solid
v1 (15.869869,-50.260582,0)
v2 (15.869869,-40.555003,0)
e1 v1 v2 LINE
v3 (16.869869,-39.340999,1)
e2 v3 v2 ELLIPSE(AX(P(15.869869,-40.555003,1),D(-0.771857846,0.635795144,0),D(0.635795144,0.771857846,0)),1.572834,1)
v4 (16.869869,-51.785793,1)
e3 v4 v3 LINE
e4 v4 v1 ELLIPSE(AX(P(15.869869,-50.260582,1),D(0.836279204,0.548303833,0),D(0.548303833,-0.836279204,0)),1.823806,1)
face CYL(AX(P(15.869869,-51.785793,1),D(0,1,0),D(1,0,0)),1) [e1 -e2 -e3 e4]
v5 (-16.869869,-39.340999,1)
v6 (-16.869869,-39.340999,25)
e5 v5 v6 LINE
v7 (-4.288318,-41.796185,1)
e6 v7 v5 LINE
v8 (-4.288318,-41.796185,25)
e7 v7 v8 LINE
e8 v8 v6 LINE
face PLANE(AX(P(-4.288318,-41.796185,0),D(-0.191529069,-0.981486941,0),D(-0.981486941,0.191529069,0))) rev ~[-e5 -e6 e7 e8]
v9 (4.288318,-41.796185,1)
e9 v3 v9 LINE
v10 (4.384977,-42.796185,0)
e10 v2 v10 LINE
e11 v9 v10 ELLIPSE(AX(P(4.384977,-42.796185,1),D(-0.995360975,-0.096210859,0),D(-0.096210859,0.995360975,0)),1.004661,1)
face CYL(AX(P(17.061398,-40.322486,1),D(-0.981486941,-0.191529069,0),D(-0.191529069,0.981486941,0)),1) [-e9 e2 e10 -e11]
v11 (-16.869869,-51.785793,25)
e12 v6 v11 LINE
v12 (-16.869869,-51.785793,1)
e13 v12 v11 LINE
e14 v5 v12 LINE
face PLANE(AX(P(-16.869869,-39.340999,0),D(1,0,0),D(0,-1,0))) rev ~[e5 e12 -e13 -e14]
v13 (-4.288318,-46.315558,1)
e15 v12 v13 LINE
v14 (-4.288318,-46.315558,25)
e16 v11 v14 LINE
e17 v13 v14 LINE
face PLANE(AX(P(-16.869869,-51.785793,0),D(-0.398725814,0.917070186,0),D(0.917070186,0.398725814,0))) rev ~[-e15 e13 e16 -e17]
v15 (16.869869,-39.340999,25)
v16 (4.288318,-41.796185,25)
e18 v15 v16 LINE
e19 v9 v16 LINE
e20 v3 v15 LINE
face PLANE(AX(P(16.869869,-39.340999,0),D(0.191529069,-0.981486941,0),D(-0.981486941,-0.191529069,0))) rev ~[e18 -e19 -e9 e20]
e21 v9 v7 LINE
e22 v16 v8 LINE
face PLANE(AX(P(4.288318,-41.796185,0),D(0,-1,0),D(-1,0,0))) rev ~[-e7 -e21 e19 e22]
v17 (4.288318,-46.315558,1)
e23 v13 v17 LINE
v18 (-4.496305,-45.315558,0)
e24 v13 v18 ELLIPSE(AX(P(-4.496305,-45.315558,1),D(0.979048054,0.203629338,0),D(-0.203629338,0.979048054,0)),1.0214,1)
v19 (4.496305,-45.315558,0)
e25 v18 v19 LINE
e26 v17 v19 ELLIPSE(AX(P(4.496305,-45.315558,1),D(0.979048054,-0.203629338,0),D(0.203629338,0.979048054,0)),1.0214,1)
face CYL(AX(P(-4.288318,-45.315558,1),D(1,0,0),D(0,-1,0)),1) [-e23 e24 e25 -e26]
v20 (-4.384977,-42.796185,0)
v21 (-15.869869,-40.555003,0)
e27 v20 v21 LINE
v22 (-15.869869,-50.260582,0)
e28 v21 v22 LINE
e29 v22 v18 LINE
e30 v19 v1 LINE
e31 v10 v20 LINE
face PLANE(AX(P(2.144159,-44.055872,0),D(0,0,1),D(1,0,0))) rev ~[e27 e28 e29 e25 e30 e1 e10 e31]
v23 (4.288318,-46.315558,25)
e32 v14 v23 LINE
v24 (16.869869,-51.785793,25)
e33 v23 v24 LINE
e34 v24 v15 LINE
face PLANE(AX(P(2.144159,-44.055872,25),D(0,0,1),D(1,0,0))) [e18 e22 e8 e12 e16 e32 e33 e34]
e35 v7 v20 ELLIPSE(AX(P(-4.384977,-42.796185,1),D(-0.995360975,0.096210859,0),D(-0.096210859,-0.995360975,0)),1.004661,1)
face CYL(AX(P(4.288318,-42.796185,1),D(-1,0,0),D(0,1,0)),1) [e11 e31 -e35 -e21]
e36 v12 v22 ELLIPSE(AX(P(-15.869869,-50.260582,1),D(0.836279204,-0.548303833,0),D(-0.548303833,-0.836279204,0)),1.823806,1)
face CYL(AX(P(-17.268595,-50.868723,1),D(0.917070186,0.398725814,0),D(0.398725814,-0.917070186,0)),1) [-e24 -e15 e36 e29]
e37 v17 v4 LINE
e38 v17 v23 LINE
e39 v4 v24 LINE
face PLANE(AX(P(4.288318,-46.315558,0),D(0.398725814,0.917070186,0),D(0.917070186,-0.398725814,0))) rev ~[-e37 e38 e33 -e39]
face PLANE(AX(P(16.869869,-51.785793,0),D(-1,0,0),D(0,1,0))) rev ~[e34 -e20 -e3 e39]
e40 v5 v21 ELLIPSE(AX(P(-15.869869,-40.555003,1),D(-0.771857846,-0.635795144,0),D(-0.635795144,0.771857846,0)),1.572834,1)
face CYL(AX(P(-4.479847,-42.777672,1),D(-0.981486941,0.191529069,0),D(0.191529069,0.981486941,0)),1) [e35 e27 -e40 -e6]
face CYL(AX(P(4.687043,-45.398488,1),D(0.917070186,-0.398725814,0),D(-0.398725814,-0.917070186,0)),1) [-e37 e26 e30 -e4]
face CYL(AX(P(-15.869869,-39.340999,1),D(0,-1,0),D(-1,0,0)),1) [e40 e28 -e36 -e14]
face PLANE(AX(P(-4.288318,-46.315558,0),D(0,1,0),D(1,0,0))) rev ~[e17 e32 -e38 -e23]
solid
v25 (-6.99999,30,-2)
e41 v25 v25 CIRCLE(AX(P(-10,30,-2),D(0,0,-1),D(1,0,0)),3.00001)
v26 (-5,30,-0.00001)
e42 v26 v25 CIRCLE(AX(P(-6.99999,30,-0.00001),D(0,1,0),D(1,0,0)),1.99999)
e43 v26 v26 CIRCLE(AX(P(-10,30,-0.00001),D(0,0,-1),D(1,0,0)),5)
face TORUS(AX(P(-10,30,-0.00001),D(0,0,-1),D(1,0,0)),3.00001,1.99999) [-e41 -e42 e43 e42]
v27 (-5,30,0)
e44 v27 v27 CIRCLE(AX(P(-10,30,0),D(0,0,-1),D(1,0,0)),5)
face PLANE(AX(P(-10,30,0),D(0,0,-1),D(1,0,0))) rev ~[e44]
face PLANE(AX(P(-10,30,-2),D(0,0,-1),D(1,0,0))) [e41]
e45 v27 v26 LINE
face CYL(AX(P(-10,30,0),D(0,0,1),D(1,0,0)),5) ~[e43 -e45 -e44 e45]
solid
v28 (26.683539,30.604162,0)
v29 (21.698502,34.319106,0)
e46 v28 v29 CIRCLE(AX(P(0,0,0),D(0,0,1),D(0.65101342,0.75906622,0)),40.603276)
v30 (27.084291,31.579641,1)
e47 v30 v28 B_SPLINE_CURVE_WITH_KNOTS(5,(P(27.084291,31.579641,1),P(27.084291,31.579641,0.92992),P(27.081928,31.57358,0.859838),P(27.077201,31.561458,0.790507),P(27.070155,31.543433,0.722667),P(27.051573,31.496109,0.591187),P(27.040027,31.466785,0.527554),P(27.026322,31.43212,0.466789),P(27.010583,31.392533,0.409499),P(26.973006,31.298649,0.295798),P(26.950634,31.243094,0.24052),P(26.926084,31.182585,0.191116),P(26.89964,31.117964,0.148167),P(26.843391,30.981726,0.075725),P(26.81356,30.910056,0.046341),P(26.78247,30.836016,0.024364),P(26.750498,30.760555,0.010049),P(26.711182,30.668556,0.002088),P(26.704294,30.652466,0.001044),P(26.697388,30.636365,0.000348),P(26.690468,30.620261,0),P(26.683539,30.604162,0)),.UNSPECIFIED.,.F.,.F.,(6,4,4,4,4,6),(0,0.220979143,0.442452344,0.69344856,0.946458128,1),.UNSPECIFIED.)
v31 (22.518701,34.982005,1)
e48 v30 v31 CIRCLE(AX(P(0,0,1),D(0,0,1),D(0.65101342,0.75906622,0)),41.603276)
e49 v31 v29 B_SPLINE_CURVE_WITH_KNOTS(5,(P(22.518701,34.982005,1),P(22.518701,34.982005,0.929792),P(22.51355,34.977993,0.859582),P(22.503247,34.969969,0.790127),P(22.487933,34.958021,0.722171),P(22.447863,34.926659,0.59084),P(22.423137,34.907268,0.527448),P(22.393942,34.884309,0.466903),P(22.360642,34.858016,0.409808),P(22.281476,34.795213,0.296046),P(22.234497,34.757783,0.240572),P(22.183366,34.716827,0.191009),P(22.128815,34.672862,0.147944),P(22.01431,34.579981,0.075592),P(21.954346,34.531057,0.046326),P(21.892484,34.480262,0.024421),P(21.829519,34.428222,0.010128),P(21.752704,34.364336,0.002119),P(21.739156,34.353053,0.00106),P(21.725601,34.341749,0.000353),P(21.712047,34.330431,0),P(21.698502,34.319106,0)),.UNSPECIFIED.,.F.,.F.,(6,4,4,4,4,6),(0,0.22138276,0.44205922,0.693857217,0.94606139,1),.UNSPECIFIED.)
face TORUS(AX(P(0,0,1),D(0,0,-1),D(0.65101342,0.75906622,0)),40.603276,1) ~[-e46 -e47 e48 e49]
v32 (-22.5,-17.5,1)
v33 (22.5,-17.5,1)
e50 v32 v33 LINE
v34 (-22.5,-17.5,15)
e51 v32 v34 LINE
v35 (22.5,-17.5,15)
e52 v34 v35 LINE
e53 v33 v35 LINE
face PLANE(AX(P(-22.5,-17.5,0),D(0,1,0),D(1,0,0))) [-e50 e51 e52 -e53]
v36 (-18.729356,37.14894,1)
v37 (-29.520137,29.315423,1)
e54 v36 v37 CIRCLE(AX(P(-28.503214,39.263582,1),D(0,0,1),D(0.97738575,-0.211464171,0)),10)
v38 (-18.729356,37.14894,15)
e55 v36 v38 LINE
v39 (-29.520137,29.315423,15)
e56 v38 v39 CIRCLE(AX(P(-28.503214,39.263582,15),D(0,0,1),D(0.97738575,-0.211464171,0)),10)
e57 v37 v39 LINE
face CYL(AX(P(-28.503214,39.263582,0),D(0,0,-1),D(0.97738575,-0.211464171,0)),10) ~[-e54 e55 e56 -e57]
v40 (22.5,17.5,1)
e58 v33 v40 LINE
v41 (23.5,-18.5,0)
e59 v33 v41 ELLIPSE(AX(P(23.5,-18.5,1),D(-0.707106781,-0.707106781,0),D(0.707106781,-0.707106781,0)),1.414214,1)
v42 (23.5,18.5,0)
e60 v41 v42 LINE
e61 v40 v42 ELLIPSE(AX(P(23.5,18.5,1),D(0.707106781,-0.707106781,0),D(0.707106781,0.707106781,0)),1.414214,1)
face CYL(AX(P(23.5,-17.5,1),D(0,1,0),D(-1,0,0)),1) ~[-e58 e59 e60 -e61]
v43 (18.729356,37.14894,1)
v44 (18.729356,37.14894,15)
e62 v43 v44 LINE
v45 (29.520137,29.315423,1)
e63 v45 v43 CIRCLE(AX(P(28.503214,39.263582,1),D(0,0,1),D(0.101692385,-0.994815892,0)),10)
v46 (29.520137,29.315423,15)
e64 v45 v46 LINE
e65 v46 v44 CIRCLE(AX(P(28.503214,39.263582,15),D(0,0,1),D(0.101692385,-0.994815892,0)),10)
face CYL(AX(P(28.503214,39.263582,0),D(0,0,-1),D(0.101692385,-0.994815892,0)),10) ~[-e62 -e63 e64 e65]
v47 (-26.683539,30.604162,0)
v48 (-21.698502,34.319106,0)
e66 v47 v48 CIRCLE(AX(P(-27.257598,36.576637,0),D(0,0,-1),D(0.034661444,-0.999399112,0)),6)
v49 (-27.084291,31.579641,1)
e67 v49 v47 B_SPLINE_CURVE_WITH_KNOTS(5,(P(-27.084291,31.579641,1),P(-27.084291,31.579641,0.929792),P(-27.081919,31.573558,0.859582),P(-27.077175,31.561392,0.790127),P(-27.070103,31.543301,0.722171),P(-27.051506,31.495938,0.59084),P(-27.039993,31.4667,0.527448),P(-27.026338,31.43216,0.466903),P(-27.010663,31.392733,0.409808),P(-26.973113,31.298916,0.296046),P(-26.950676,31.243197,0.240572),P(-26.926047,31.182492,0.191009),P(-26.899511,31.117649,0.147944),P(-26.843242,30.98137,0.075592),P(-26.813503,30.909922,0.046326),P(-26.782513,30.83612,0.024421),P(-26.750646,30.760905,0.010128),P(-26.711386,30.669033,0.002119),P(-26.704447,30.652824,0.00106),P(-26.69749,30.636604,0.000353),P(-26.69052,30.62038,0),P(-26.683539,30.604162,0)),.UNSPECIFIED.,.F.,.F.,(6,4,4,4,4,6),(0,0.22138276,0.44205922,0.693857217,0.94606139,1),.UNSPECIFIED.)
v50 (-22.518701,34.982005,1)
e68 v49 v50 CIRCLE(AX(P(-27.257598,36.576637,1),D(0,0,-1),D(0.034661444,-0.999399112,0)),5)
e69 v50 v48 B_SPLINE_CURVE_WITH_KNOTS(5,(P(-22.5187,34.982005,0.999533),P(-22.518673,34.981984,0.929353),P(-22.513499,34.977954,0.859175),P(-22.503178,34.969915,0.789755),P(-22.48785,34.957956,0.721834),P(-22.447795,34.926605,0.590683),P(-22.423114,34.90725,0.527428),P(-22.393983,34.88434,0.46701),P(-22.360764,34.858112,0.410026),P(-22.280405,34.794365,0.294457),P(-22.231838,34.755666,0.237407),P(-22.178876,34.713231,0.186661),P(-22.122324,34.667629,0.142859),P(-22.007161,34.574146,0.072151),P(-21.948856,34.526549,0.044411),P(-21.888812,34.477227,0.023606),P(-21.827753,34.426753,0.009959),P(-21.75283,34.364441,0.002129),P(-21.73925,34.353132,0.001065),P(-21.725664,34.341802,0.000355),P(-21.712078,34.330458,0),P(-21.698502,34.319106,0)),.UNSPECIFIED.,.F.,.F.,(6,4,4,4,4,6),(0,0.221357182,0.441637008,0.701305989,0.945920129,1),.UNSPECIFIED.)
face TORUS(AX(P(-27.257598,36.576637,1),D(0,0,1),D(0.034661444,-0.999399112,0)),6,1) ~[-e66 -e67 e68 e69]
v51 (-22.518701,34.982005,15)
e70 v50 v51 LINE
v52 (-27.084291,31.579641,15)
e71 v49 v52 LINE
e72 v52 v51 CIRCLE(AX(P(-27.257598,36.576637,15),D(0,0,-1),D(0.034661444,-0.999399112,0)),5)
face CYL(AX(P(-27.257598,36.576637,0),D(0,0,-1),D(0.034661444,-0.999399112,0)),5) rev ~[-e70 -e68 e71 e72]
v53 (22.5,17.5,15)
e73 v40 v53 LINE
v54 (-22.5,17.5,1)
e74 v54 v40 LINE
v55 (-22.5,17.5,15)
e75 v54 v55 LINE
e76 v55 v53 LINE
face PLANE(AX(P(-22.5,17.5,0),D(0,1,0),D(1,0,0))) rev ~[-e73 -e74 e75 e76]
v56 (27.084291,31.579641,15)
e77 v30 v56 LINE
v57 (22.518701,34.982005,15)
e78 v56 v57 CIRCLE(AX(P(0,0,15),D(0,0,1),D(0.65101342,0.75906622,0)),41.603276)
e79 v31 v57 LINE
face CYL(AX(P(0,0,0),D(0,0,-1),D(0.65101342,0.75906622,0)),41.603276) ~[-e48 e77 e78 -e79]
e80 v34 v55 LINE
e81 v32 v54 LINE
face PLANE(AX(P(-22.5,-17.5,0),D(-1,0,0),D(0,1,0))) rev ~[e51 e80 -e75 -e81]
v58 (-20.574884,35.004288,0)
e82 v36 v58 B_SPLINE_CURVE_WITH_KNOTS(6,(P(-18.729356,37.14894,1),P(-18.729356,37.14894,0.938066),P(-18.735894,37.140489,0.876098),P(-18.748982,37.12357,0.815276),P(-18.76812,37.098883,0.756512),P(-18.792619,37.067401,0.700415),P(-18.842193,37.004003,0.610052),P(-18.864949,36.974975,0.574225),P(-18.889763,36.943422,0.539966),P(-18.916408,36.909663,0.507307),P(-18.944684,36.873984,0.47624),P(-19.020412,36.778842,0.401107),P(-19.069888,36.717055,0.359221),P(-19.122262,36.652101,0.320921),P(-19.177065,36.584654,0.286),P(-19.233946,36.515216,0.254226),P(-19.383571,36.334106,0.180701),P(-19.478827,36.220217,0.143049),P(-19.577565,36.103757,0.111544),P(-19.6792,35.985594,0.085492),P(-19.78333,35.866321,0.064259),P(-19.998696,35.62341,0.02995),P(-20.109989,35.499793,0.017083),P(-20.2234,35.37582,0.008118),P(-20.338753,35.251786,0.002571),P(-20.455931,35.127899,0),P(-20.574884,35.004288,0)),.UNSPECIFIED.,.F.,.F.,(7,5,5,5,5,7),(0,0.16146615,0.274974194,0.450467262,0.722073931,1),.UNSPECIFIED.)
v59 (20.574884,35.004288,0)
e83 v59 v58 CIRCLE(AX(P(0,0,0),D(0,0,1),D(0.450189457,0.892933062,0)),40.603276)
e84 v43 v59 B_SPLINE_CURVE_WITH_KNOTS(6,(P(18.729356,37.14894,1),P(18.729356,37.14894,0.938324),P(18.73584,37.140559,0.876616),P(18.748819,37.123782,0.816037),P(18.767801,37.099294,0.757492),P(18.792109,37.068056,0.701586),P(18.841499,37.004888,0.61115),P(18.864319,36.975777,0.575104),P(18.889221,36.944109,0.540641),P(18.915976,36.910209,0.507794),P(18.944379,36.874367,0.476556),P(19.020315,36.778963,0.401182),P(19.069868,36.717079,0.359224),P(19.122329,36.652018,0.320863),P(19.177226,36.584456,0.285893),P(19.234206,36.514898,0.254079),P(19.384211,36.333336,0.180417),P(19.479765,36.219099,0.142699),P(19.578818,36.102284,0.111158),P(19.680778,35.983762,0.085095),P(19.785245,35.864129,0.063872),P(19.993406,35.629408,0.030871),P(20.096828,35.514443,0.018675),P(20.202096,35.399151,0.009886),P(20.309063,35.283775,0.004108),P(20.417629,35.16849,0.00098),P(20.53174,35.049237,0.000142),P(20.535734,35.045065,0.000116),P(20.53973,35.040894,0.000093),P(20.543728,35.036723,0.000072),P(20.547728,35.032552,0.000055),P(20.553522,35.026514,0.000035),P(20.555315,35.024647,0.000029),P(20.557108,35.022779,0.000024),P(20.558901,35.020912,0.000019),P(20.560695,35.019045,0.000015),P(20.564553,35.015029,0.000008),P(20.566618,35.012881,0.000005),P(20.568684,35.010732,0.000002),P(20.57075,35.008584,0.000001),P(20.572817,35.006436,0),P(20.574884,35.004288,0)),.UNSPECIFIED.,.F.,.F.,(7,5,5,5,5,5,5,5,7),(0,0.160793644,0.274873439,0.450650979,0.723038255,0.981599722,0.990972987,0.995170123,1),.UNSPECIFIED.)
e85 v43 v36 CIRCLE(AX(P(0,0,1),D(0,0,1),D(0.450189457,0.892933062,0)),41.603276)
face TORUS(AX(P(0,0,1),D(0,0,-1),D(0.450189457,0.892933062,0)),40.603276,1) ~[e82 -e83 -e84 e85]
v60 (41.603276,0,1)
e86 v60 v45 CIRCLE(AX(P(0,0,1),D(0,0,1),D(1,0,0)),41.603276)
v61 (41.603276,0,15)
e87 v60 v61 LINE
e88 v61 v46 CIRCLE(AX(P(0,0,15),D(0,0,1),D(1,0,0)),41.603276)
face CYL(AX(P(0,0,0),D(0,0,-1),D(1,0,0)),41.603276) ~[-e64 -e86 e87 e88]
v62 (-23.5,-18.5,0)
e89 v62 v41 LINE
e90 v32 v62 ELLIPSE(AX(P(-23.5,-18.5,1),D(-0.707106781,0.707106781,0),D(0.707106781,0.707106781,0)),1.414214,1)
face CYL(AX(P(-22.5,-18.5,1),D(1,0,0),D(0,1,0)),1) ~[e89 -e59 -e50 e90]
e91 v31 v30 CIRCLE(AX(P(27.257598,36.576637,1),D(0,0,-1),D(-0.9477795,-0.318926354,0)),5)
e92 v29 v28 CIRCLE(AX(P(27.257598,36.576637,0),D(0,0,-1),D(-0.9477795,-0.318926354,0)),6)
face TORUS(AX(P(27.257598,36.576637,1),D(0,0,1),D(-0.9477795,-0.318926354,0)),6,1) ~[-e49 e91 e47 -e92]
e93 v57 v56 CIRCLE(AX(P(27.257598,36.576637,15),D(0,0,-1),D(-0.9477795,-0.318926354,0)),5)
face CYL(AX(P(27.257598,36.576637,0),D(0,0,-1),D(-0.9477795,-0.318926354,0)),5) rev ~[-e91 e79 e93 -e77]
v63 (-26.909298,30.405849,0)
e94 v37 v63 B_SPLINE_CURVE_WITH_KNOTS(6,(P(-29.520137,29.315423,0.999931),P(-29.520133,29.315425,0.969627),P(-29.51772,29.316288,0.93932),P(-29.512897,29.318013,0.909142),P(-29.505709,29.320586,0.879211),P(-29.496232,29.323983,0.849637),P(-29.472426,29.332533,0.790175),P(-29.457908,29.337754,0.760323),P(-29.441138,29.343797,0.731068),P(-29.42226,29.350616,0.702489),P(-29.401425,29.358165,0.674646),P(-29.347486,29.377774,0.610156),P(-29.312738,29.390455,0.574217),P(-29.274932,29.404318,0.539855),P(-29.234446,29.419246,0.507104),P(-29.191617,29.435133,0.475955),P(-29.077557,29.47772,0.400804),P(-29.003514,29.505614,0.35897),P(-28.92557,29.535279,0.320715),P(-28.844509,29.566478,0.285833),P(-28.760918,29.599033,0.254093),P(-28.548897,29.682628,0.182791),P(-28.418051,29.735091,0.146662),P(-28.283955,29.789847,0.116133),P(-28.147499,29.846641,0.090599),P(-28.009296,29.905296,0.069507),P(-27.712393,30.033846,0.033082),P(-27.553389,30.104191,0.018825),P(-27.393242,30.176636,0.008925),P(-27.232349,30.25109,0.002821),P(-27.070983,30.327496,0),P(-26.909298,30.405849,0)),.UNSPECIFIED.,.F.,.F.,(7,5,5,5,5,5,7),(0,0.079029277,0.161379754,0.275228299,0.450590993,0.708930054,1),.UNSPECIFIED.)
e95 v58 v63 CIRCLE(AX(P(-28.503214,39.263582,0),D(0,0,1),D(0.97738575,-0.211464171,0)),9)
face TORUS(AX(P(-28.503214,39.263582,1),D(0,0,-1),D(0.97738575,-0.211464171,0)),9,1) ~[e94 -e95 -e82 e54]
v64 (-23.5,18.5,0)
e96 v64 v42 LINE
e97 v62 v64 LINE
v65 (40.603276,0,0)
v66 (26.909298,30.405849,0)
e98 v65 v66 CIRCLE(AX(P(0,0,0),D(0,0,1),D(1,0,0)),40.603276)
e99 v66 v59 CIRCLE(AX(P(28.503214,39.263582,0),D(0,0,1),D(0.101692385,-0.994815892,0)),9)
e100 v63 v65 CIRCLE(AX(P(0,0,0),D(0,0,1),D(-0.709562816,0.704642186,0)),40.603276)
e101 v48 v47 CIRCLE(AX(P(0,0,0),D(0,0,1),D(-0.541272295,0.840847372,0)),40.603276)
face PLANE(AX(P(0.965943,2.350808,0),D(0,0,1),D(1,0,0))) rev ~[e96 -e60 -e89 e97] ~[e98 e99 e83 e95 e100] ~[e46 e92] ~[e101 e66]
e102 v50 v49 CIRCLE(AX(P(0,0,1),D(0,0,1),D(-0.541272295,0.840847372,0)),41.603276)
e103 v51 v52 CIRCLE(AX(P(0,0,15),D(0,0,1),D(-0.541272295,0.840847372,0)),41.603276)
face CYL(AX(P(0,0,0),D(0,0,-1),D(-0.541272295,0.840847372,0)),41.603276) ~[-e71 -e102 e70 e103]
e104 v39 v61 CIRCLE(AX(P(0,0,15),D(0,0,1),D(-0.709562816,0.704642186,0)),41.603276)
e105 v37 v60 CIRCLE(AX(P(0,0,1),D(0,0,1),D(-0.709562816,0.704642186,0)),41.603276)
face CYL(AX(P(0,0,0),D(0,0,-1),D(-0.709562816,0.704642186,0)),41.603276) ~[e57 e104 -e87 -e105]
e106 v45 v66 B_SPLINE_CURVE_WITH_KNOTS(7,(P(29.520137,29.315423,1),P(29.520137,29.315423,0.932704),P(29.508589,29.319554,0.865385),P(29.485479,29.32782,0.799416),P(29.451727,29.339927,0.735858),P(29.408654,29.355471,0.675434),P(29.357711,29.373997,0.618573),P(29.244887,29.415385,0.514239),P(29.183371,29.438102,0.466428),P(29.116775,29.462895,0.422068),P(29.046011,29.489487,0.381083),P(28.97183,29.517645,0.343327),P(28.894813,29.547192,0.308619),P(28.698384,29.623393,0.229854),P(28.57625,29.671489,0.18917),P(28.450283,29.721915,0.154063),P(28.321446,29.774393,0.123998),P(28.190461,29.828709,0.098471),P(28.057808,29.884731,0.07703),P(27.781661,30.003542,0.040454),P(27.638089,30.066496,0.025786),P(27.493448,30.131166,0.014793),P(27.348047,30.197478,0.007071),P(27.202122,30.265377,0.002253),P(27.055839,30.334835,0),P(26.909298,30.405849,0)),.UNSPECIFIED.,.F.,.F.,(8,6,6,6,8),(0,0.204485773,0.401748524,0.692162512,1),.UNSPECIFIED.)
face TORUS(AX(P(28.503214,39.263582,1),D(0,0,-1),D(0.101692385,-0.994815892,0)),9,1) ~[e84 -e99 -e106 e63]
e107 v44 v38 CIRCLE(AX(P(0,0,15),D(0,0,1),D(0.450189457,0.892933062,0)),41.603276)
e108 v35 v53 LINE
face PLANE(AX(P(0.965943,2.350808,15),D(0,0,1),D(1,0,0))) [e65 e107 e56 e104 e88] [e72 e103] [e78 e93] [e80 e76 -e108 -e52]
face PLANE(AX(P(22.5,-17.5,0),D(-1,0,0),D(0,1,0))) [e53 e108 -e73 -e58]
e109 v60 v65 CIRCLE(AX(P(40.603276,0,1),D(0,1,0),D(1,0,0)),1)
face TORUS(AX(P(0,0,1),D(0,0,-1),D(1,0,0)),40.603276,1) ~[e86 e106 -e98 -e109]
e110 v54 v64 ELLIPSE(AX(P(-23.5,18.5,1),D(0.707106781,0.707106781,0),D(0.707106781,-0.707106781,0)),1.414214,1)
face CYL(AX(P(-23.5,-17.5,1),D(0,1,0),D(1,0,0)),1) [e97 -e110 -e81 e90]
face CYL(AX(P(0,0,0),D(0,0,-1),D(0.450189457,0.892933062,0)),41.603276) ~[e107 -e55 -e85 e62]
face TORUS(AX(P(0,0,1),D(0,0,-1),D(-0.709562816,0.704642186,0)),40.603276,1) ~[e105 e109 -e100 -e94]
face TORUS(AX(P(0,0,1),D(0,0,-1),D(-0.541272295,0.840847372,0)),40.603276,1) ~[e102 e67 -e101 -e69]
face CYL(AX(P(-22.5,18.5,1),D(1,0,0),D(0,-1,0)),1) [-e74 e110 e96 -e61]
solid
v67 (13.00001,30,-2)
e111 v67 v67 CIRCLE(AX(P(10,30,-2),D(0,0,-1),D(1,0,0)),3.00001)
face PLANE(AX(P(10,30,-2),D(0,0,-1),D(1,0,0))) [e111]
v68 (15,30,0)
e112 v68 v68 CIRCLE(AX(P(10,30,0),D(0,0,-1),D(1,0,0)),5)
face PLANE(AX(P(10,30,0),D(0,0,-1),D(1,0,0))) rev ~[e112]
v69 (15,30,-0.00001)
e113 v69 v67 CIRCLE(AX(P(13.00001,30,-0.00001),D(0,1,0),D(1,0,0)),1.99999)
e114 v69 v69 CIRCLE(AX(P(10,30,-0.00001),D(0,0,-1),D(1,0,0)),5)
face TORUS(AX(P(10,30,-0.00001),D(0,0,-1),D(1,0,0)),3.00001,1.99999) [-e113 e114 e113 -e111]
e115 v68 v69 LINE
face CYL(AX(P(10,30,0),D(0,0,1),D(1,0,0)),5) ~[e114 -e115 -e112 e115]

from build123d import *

# Parameters (mm, degrees)
F0_W     = 45
F0_H     = 35
F1_DEPTH = 15
F2_W     = 4.2883176357
F2_H     = 4.5193734479
F3_DEPTH = 25
F4_R     = 5
F5_DEPTH = 2
F6_R     = 1.99999
F6_2_R   = 1.99999
F7_R     = 1
F8_R     = 1


# Not quite as in the source:
# - a fillet or chamfer is up to 0.001 mm smaller than in the source, because OpenCascade refuses the exact size


with BuildPart() as f1:
    # F0 (on Top) → F1 (new body)
    with BuildSketch(Plane.XY):
        with BuildLine():
            ThreePointArc((-29.5201374917, 29.3154231969), (-15.8539921459, -38.4640544896), (41.6032757694, 0))
            ThreePointArc((41.6032757694, 0), (38.4640544896, 15.8539921459), (29.5201374917, 29.3154231969))
            ThreePointArc((29.5201374917, 29.3154231969), (28.3248477073, 30.4718814172), (27.0842908419, 31.5796412952))
            ThreePointArc((27.0842908419, 31.5796412952), (24.8597708938, 33.3590219558), (22.518700562, 34.9820050846))
            ThreePointArc((22.518700562, 34.9820050846), (20.6524683181, 36.1152060372), (18.7293561418, 37.1489404056))
            ThreePointArc((18.7293561418, 37.1489404056), (0, 41.6032757694), (-18.7293561418, 37.1489404056))
            ThreePointArc((-18.7293561418, 37.1489404056), (-20.6524683181, 36.1152060372), (-22.518700562, 34.9820050846))
            ThreePointArc((-22.518700562, 34.9820050846), (-24.8597708938, 33.3590219558), (-27.0842908419, 31.5796412952))
            ThreePointArc((-27.0842908419, 31.5796412952), (-28.3248477073, 30.4718814172), (-29.5201374917, 29.3154231969))
        make_face()
        Rectangle(F0_W, F0_H, mode=Mode.SUBTRACT)
        with BuildLine():
            ThreePointArc((27.0842908419, 31.5796412952), (28.3248477073, 30.4718814172), (29.5201374917, 29.3154231969))
            ThreePointArc((29.5201374917, 29.3154231969), (34.3779025449, 47.3560496198), (18.7293561418, 37.1489404056))
            ThreePointArc((18.7293561418, 37.1489404056), (20.6524683181, 36.1152060372), (22.518700562, 34.9820050846))
            ThreePointArc((22.518700562, 34.9820050846), (30.245316029, 40.5858189836), (27.0842908419, 31.5796412952))
        make_face()
        with BuildLine():
            ThreePointArc((-18.7293561418, 37.1489404056), (-34.3779025449, 47.3560496198), (-29.5201374917, 29.3154231969))
            ThreePointArc((-29.5201374917, 29.3154231969), (-28.3248477073, 30.4718814172), (-27.0842908419, 31.5796412952))
            ThreePointArc((-27.0842908419, 31.5796412952), (-30.245316029, 40.5858189836), (-22.518700562, 34.9820050846))
            ThreePointArc((-22.518700562, 34.9820050846), (-20.6524683181, 36.1152060372), (-18.7293561418, 37.1489404056))
        make_face()
    extrude(amount=F1_DEPTH)

    # F7
    f7_edges = [f1.edges().sort_by_distance(p)[0] for p in [
        (0, -41.603276, 0),
        (-34.377903, 47.35605, 0),
        (0, 41.603276, 0),
        (34.377903, 47.35605, 0),
        (30.245316, 40.585819, 0),
        (24.859771, 33.359022, 0),
        (-30.245316, 40.585819, 0),
        (-24.859771, 33.359022, 0),
        (0, -17.5, 0),
        (22.5, 0, 0),
        (0, 17.5, 0),
        (-22.5, 0, 0),
    ]]
    fillet(f7_edges, radius=F7_R)


with BuildPart() as f3:
    # F2 (on Top) → F3 (new body)
    with BuildSketch(Plane.XY):
        with Locations((2.1441588178, -44.0558715308)):
            Rectangle(F2_W, F2_H)
        with Locations((-2.1441588178, -44.0558715308)):
            Rectangle(F2_W, F2_H)
        Polygon((16.8698690832, -39.3409989774), (4.2883176357, -41.7961848068), (4.2883176357, -46.3155582547), (16.8698690832, -51.7857931554), align=None)
        Polygon((-4.2883176357, -46.3155582547), (-4.2883176357, -41.7961848068), (-16.8698690832, -39.3409989774), (-16.8698690832, -51.7857931554), align=None)
    extrude(amount=F3_DEPTH)

    # F8
    f8_edges = [f3.edges().sort_by_distance(p)[0] for p in [
        (0, -41.796185, 0),
        (-10.579093, -40.568592, 0),
        (-16.869869, -45.563396, 0),
        (-10.579093, -49.050676, 0),
        (0, -46.315558, 0),
        (10.579093, -49.050676, 0),
        (16.869869, -45.563396, 0),
        (10.579093, -40.568592, 0),
    ]]
    fillet(f8_edges, radius=F8_R)


with BuildPart() as f5:
    # F4 (on face) → F5 (new body)
    with BuildSketch(Plane(origin=(0, 0, 0), x_dir=(1, 0, 0), z_dir=(0, 0, -1))):
        with Locations((-10, -30)):
            Circle(F4_R)
    extrude(amount=F5_DEPTH)

    # F6 (radius 2 in the source; OpenCascade refuses exactly that, so slightly less here)
    f6_edges = [f5.edges().sort_by_distance(p)[0] for p in [
        (-15, 30, -2),
    ]]
    fillet(f6_edges, radius=F6_R)


with BuildPart() as f5b:
    # F4 (on face) → F5, piece 2 (new body)
    with BuildSketch(Plane(origin=(0, 0, 0), x_dir=(1, 0, 0), z_dir=(0, 0, -1))):
        with Locations((10, -30)):
            Circle(F4_R)
    extrude(amount=F5_DEPTH)

    # F6#2 (radius 2 in the source; OpenCascade refuses exactly that, so slightly less here)
    f6_2_edges = [f5b.edges().sort_by_distance(p)[0] for p in [
        (5, 30, -2),
    ]]
    fillet(f6_2_edges, radius=F6_2_R)


solid = Compound([f1.part, f3.part, f5.part, f5b.part])
